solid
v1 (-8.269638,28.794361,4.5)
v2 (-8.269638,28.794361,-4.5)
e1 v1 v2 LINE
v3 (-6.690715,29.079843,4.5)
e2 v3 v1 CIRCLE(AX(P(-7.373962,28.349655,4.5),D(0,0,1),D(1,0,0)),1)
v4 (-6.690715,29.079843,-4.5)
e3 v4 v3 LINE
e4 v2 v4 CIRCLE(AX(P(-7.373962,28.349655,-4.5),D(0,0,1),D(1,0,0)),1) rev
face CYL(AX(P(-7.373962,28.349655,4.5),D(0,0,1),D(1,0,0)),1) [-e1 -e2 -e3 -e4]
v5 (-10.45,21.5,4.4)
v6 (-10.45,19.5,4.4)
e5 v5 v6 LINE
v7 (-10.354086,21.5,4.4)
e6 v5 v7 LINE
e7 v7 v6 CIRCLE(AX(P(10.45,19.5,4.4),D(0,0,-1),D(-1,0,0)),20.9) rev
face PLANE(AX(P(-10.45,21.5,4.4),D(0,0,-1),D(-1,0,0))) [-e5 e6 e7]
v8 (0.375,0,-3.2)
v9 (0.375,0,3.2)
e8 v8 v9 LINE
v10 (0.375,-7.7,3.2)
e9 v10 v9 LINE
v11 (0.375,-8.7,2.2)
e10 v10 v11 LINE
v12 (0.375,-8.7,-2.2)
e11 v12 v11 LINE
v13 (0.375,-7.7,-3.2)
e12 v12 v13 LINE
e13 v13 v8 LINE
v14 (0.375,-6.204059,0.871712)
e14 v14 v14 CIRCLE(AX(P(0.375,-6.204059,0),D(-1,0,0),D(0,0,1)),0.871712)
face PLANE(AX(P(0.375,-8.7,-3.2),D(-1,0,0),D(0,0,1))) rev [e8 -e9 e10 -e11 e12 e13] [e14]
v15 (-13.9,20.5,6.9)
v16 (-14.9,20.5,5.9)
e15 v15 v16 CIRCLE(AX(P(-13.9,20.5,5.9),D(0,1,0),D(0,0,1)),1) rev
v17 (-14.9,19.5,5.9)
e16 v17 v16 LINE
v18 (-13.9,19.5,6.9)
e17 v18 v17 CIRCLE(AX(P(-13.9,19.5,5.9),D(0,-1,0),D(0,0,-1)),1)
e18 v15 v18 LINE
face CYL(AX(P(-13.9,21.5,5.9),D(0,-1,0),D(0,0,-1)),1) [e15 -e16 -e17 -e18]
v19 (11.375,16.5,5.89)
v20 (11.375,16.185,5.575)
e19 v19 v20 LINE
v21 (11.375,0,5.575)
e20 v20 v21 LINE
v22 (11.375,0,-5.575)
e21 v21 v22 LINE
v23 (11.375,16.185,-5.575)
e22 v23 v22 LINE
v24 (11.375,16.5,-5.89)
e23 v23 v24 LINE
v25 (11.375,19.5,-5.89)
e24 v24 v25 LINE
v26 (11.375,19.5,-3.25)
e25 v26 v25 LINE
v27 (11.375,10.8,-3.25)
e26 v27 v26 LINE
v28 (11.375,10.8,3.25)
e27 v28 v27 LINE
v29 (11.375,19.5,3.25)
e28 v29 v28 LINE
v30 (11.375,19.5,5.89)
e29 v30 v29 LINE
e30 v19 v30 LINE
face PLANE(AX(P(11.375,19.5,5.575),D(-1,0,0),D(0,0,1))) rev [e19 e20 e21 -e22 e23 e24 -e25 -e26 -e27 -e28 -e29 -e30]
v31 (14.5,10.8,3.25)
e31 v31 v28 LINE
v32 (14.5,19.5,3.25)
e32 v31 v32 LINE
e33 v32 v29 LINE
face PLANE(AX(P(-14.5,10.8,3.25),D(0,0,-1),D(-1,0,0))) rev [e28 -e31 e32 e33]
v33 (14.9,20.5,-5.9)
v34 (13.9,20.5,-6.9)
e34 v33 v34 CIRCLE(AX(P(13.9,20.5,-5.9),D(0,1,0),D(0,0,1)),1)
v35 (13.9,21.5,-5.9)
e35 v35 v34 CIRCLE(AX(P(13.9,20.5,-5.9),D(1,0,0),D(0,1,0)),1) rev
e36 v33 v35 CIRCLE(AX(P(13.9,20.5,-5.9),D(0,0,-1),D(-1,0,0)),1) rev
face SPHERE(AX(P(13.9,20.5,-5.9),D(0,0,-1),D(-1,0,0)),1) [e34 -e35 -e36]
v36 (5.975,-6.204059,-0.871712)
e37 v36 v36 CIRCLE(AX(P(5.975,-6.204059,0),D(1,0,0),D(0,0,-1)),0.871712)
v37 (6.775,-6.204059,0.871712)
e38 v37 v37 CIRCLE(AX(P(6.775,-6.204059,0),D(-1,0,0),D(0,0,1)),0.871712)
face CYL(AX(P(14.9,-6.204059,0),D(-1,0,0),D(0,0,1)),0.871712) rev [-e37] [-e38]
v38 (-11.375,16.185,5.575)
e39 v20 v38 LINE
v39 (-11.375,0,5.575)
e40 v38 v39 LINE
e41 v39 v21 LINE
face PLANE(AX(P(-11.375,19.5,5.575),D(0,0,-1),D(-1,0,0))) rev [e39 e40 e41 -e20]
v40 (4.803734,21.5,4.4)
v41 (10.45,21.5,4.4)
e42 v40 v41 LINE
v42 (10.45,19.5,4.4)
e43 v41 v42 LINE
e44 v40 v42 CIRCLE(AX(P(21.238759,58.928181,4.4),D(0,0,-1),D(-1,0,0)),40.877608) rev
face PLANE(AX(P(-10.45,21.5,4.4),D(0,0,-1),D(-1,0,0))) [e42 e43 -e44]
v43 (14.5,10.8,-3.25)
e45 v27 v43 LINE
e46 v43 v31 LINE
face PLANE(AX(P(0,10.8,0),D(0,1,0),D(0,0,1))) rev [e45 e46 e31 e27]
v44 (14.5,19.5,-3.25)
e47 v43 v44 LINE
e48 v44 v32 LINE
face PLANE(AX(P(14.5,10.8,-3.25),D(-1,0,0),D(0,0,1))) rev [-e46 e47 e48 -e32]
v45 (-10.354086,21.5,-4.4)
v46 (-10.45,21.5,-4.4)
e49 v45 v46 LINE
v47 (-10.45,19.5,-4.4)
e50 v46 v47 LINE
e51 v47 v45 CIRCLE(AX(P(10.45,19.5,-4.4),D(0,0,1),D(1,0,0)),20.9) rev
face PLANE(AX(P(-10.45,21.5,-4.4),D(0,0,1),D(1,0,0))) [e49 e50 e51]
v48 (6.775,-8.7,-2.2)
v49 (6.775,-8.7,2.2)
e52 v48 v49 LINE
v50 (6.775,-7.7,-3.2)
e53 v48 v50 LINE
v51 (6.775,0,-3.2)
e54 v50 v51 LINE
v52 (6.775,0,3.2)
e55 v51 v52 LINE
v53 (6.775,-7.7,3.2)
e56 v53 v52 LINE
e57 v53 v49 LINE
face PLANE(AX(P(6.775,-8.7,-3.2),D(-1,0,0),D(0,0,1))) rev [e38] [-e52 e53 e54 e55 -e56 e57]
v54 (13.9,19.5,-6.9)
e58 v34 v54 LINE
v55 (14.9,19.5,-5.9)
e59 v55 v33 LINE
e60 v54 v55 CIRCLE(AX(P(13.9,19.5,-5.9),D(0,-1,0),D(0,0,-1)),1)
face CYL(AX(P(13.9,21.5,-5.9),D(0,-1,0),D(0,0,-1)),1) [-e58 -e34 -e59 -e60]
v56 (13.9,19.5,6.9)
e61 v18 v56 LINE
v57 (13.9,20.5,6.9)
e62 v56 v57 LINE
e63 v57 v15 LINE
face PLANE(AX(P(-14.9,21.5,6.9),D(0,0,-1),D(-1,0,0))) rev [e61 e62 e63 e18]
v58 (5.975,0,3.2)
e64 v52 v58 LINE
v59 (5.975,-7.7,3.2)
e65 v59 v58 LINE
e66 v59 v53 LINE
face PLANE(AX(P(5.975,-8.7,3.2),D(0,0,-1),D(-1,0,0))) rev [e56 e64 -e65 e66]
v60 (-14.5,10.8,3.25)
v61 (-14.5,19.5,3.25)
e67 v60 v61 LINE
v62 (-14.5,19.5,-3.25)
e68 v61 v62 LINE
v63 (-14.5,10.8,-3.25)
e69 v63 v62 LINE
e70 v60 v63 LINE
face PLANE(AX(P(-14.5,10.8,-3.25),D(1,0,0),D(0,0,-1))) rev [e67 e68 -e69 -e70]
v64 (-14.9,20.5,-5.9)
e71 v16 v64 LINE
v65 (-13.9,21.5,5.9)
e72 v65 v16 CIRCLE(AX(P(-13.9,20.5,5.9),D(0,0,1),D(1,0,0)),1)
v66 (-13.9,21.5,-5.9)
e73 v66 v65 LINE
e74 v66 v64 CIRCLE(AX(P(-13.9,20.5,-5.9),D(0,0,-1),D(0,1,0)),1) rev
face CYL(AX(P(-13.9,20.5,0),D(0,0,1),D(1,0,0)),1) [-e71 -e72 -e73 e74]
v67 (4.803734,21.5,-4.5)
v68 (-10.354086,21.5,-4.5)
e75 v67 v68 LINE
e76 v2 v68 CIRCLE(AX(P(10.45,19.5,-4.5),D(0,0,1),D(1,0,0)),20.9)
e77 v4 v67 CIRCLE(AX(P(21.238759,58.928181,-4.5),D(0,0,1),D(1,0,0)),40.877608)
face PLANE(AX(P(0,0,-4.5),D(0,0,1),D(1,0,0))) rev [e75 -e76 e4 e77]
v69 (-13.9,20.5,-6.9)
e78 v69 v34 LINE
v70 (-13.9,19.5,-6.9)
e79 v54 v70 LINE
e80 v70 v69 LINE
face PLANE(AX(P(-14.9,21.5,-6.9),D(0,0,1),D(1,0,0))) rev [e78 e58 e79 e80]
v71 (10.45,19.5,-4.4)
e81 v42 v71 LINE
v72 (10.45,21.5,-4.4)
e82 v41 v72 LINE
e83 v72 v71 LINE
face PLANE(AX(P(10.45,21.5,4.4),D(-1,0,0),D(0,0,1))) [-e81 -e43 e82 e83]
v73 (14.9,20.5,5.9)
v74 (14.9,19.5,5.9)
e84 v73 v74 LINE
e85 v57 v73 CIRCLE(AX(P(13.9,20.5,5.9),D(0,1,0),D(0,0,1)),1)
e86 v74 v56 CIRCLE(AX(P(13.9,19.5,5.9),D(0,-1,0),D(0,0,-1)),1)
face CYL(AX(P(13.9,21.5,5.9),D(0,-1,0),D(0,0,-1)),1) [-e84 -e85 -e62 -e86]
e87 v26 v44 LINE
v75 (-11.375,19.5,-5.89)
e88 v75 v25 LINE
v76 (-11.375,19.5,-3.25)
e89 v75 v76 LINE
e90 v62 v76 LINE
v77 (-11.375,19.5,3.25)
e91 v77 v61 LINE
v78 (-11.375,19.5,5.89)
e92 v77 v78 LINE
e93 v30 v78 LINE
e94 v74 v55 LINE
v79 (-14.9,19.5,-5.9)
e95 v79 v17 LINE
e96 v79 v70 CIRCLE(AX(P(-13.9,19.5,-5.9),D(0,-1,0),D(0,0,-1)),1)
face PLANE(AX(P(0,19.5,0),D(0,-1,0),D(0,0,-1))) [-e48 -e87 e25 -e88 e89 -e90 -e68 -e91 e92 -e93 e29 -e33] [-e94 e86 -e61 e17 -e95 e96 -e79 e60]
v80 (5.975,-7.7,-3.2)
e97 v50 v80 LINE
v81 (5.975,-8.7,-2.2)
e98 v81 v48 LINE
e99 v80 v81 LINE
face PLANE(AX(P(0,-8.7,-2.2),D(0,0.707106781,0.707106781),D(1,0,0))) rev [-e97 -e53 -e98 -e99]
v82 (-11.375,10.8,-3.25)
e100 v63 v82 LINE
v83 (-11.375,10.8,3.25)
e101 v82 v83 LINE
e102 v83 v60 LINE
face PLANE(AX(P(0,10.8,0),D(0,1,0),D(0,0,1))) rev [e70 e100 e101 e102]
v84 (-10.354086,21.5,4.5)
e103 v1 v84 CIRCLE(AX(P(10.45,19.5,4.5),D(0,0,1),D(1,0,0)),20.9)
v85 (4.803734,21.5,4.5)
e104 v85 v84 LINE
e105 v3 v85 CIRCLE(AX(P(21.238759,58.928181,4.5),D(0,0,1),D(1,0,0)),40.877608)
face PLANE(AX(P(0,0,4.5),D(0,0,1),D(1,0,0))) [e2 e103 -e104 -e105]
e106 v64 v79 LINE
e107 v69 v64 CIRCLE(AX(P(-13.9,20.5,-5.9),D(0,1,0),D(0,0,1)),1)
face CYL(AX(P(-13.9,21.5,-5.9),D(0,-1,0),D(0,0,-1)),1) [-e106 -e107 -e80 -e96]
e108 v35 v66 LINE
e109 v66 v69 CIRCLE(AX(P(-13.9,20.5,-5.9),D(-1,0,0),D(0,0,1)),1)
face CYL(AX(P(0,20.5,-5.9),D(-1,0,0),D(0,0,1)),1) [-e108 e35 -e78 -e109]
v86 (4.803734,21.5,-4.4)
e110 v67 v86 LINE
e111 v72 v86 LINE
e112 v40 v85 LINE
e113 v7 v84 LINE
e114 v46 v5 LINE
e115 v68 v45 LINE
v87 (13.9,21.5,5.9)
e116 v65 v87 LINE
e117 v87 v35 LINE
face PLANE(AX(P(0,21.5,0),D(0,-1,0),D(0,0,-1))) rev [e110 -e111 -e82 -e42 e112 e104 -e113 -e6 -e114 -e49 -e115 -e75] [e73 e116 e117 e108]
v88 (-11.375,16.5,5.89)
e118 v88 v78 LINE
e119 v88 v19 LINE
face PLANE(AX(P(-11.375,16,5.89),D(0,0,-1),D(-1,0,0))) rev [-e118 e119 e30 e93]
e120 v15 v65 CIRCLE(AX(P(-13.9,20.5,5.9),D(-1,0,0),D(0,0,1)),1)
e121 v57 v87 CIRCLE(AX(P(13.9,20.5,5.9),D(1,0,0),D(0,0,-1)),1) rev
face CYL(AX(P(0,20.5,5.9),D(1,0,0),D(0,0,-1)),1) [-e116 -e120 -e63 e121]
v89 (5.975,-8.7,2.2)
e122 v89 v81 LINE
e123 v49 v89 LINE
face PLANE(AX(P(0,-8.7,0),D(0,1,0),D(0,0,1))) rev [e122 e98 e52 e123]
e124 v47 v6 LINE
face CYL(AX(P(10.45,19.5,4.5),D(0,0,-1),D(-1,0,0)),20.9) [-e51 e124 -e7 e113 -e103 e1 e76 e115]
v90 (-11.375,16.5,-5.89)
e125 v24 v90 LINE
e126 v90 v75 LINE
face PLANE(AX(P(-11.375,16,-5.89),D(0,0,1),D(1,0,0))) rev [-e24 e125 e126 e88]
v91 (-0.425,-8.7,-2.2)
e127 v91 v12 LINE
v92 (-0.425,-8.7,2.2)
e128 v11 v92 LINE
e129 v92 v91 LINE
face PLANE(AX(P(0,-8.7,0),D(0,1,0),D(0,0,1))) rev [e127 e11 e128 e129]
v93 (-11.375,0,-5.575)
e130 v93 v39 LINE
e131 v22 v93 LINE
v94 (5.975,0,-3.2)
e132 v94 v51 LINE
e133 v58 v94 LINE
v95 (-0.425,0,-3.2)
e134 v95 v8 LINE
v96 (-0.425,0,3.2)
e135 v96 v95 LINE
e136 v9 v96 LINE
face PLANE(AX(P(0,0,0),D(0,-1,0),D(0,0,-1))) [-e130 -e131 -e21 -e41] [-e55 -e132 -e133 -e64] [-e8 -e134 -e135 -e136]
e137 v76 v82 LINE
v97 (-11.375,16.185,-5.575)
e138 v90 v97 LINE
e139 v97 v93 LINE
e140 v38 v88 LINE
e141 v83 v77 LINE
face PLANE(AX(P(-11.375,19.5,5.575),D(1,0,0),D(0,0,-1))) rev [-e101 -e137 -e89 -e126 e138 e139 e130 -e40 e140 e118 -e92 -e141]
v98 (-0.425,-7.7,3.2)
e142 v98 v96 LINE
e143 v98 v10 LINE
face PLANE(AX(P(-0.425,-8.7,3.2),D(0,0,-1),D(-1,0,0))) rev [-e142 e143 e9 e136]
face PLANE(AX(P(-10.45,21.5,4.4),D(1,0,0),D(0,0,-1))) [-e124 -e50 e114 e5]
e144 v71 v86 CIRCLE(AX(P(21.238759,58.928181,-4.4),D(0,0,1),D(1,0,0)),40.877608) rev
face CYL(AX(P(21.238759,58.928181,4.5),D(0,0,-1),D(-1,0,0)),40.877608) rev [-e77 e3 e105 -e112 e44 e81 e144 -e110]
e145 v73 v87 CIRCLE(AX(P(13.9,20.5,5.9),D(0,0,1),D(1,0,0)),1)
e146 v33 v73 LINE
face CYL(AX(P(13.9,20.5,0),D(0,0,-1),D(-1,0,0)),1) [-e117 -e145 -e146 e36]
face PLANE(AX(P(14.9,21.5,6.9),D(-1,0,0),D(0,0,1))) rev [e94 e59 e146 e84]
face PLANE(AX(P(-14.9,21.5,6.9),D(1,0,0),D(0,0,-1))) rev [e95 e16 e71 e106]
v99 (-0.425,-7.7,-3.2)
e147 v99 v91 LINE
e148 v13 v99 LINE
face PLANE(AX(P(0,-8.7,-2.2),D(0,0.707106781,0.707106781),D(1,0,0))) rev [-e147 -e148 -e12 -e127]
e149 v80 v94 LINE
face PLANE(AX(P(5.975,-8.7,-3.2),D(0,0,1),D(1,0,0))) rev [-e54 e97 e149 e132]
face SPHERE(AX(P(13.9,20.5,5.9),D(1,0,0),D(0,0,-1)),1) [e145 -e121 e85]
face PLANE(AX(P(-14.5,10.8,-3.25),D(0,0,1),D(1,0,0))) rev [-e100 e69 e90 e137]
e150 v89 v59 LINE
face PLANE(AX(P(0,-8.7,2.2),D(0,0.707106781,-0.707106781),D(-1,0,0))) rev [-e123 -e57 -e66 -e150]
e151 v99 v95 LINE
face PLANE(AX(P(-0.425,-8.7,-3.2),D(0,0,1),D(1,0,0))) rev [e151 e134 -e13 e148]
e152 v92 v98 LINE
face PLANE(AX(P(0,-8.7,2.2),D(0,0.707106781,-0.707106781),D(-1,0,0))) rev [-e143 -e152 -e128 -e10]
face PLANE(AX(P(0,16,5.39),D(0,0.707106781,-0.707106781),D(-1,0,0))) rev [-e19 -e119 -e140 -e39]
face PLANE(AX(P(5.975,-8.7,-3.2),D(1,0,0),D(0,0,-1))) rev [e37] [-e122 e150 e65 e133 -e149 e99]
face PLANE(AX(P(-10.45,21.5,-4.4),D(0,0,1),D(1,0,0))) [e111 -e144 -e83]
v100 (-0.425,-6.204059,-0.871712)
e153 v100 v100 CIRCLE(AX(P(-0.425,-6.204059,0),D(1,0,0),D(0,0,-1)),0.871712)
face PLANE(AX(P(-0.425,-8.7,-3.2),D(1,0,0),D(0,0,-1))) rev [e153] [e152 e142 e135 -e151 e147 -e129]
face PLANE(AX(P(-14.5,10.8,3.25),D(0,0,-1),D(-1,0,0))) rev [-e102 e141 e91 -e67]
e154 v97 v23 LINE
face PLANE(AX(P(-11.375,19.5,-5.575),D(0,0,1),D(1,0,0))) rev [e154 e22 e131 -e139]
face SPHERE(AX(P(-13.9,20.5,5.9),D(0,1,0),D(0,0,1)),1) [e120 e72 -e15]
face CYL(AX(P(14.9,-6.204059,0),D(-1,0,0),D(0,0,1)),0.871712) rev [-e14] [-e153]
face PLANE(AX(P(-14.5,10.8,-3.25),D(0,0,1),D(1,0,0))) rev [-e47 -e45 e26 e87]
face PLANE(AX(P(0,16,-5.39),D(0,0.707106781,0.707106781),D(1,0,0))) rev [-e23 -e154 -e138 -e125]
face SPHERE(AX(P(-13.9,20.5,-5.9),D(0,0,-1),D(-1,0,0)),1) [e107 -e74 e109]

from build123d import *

# Parameters (mm, degrees)
SKETCH1_W               = 22.75
SKETCH1_H               = 11.15
BOSS_EXTRUDE1_DEPTH     = 19.5
SKETCH2_W               = 29.8
SKETCH2_H               = 13.8
SKETCH2_W_2             = 20.9
SKETCH2_H_2             = 8.8
BOSS_EXTRUDE2_DEPTH     = 2
FILLET1_R               = 1
BOSS_EXTRUDE3_DEPTH     = 4.5
FILLET2_R               = 1
SKETCH4_W               = 0.8
SKETCH4_H               = 6.4
BOSS_EXTRUDE4_DEPTH     = 8.7
CHAMFER1_SIZE           = 1
SKETCH5_W               = 29
SKETCH5_H               = 6.5
BOSS_EXTRUDE5_DEPTH     = 8.7
SKETCH6_W               = 22.75
SKETCH6_H               = 11.78
BOSS_EXTRUDE6_DEPTH     = 3.5
CHAMFER2_SIZE           = 0.5
CUT_EXTRUDE1_DEPTH      = 34.821116013
CUT_EXTRUDE1_DEPTH_BACK = 34.821116013
SKETCH7_R               = 0.871711707


with BuildPart() as part:
    # Sketch1 → Boss-Extrude1 (new body)
    with BuildSketch(Plane(origin=(0, 0, 0), x_dir=(1, 0, 0), z_dir=(0, 1, 0))):
        Rectangle(SKETCH1_W, SKETCH1_H)
    extrude(amount=BOSS_EXTRUDE1_DEPTH)

    # Sketch2 → Boss-Extrude2 (add)
    with BuildSketch(Plane(origin=(0, 19.5, 0), x_dir=(1, 0, 0), z_dir=(0, 1, 0))):
        Rectangle(SKETCH2_W, SKETCH2_H)
        Rectangle(SKETCH2_W_2, SKETCH2_H_2, mode=Mode.SUBTRACT)
    extrude(amount=BOSS_EXTRUDE2_DEPTH)

    # Fillet1
    fillet1_edges = [part.edges().sort_by_distance(p)[0] for p in [
        (14.9, 21.5, 0),
        (0, 21.5, -6.9),
        (-14.9, 21.5, 0),
        (0, 21.5, 6.9),
        (14.9, 20.5, 6.9),
        (14.9, 20.5, -6.9),
        (-14.9, 20.5, -6.9),
        (-14.9, 20.5, 6.9),
    ]]
    fillet(fillet1_edges, radius=FILLET1_R)

    # Sketch3 → Boss-Extrude3 (add, symmetric)
    with BuildSketch(Plane.XY):
        with BuildLine():
            ThreePointArc((-7.628944694, 29.986265243), (-9.732417399, 24.929551358), (-10.45, 19.5))
            Line((-10.45, 19.5), (10.45, 19.5))
            ThreePointArc((10.45, 19.5), (0.729024757, 23.568181114), (-7.628944694, 29.986265243))
        make_face()
    extrude(amount=BOSS_EXTRUDE3_DEPTH, both=True)

    # Fillet2
    fillet2_edges = [part.edges().sort_by_distance(p)[0] for p in [
        (-7.628944694, 29.986265243, 0),
    ]]
    fillet(fillet2_edges, radius=FILLET2_R)

    # Sketch4 → Boss-Extrude4 (add)
    with BuildSketch(Plane(origin=(0, 0, 0), x_dir=(-1, 0, 0), z_dir=(0, -1, 0))):
        with Locations((-6.375, 0)):
            Rectangle(SKETCH4_W, SKETCH4_H)
        with Locations((0.025, 0)):
            Rectangle(SKETCH4_W, SKETCH4_H)
    extrude(amount=BOSS_EXTRUDE4_DEPTH)

    # Chamfer1
    chamfer1_edges = [part.edges().sort_by_distance(p)[0] for p in [
        (6.375, -8.7, 3.2),
        (6.375, -8.7, -3.2),
        (-0.025, -8.7, 3.2),
        (-0.025, -8.7, -3.2),
    ]]
    chamfer(chamfer1_edges, length=CHAMFER1_SIZE)

    # Sketch5 → Boss-Extrude5 (add)
    with BuildSketch(Plane.XZ.offset(-19.5)):
        Rectangle(SKETCH5_W, SKETCH5_H)
    extrude(amount=BOSS_EXTRUDE5_DEPTH)

    # Sketch6 → Boss-Extrude6 (add)
    with BuildSketch(Plane.XZ.offset(-19.5)):
        Rectangle(SKETCH6_W, SKETCH6_H)
    extrude(amount=BOSS_EXTRUDE6_DEPTH)

    # Chamfer2
    # the kernel refuses this chamfer: 0.5 mm, written as the material it takes off along each edge
    with BuildSketch(Plane(origin=(-12.660841494, 16, -5.89), x_dir=(0, -0.027495876610585647, 0.9996219169112968), z_dir=(1, 0, 0))) as chamfer2_piece_1_section:
        Polygon((CHAMFER2_SIZE * 0.999621916911, -CHAMFER2_SIZE * 0.0274958766106), (-CHAMFER2_SIZE * 0.0274958766106, -CHAMFER2_SIZE * 0.999621916911), (0, 0), align=None)
    chamfer2_piece_1 = extrude(amount=25.321682988, mode=Mode.PRIVATE)
    chamfer2_piece_1 = split(chamfer2_piece_1, bisect_by=Plane(origin=(0, 16.184966798, -5.575), z_dir=(0, 0, -1)), keep=Keep.TOP, mode=Mode.PRIVATE)
    add(chamfer2_piece_1, mode=Mode.SUBTRACT)
    with BuildSketch(Plane(origin=(12.660841494, 16, 5.89), x_dir=(0, 0.9996219169112968, 0.02749587661058555), z_dir=(-1, 0, 0))) as chamfer2_piece_2_section:
        Polygon((CHAMFER2_SIZE * 0.999621916911, CHAMFER2_SIZE * 0.0274958766106), (-CHAMFER2_SIZE * 0.0274958766106, CHAMFER2_SIZE * 0.999621916911), (0, 0), align=None)
    chamfer2_piece_2 = extrude(amount=25.321682988, mode=Mode.PRIVATE)
    chamfer2_piece_2 = split(chamfer2_piece_2, bisect_by=Plane(origin=(0, 16.184966798, 5.575), z_dir=(0, 0, 1)), keep=Keep.TOP, mode=Mode.PRIVATE)
    add(chamfer2_piece_2, mode=Mode.SUBTRACT)

    # Sketch7 → Cut-Extrude1 (cut, two sides: drawn at the far end of the back side and taken through both)
    with BuildSketch(Plane.ZY.offset(0.425).offset(-CUT_EXTRUDE1_DEPTH_BACK)):
        with Locations((0, -6.204058817)):
            Circle(SKETCH7_R)
    extrude(amount=CUT_EXTRUDE1_DEPTH + CUT_EXTRUDE1_DEPTH_BACK, mode=Mode.SUBTRACT)


solid = part.part
